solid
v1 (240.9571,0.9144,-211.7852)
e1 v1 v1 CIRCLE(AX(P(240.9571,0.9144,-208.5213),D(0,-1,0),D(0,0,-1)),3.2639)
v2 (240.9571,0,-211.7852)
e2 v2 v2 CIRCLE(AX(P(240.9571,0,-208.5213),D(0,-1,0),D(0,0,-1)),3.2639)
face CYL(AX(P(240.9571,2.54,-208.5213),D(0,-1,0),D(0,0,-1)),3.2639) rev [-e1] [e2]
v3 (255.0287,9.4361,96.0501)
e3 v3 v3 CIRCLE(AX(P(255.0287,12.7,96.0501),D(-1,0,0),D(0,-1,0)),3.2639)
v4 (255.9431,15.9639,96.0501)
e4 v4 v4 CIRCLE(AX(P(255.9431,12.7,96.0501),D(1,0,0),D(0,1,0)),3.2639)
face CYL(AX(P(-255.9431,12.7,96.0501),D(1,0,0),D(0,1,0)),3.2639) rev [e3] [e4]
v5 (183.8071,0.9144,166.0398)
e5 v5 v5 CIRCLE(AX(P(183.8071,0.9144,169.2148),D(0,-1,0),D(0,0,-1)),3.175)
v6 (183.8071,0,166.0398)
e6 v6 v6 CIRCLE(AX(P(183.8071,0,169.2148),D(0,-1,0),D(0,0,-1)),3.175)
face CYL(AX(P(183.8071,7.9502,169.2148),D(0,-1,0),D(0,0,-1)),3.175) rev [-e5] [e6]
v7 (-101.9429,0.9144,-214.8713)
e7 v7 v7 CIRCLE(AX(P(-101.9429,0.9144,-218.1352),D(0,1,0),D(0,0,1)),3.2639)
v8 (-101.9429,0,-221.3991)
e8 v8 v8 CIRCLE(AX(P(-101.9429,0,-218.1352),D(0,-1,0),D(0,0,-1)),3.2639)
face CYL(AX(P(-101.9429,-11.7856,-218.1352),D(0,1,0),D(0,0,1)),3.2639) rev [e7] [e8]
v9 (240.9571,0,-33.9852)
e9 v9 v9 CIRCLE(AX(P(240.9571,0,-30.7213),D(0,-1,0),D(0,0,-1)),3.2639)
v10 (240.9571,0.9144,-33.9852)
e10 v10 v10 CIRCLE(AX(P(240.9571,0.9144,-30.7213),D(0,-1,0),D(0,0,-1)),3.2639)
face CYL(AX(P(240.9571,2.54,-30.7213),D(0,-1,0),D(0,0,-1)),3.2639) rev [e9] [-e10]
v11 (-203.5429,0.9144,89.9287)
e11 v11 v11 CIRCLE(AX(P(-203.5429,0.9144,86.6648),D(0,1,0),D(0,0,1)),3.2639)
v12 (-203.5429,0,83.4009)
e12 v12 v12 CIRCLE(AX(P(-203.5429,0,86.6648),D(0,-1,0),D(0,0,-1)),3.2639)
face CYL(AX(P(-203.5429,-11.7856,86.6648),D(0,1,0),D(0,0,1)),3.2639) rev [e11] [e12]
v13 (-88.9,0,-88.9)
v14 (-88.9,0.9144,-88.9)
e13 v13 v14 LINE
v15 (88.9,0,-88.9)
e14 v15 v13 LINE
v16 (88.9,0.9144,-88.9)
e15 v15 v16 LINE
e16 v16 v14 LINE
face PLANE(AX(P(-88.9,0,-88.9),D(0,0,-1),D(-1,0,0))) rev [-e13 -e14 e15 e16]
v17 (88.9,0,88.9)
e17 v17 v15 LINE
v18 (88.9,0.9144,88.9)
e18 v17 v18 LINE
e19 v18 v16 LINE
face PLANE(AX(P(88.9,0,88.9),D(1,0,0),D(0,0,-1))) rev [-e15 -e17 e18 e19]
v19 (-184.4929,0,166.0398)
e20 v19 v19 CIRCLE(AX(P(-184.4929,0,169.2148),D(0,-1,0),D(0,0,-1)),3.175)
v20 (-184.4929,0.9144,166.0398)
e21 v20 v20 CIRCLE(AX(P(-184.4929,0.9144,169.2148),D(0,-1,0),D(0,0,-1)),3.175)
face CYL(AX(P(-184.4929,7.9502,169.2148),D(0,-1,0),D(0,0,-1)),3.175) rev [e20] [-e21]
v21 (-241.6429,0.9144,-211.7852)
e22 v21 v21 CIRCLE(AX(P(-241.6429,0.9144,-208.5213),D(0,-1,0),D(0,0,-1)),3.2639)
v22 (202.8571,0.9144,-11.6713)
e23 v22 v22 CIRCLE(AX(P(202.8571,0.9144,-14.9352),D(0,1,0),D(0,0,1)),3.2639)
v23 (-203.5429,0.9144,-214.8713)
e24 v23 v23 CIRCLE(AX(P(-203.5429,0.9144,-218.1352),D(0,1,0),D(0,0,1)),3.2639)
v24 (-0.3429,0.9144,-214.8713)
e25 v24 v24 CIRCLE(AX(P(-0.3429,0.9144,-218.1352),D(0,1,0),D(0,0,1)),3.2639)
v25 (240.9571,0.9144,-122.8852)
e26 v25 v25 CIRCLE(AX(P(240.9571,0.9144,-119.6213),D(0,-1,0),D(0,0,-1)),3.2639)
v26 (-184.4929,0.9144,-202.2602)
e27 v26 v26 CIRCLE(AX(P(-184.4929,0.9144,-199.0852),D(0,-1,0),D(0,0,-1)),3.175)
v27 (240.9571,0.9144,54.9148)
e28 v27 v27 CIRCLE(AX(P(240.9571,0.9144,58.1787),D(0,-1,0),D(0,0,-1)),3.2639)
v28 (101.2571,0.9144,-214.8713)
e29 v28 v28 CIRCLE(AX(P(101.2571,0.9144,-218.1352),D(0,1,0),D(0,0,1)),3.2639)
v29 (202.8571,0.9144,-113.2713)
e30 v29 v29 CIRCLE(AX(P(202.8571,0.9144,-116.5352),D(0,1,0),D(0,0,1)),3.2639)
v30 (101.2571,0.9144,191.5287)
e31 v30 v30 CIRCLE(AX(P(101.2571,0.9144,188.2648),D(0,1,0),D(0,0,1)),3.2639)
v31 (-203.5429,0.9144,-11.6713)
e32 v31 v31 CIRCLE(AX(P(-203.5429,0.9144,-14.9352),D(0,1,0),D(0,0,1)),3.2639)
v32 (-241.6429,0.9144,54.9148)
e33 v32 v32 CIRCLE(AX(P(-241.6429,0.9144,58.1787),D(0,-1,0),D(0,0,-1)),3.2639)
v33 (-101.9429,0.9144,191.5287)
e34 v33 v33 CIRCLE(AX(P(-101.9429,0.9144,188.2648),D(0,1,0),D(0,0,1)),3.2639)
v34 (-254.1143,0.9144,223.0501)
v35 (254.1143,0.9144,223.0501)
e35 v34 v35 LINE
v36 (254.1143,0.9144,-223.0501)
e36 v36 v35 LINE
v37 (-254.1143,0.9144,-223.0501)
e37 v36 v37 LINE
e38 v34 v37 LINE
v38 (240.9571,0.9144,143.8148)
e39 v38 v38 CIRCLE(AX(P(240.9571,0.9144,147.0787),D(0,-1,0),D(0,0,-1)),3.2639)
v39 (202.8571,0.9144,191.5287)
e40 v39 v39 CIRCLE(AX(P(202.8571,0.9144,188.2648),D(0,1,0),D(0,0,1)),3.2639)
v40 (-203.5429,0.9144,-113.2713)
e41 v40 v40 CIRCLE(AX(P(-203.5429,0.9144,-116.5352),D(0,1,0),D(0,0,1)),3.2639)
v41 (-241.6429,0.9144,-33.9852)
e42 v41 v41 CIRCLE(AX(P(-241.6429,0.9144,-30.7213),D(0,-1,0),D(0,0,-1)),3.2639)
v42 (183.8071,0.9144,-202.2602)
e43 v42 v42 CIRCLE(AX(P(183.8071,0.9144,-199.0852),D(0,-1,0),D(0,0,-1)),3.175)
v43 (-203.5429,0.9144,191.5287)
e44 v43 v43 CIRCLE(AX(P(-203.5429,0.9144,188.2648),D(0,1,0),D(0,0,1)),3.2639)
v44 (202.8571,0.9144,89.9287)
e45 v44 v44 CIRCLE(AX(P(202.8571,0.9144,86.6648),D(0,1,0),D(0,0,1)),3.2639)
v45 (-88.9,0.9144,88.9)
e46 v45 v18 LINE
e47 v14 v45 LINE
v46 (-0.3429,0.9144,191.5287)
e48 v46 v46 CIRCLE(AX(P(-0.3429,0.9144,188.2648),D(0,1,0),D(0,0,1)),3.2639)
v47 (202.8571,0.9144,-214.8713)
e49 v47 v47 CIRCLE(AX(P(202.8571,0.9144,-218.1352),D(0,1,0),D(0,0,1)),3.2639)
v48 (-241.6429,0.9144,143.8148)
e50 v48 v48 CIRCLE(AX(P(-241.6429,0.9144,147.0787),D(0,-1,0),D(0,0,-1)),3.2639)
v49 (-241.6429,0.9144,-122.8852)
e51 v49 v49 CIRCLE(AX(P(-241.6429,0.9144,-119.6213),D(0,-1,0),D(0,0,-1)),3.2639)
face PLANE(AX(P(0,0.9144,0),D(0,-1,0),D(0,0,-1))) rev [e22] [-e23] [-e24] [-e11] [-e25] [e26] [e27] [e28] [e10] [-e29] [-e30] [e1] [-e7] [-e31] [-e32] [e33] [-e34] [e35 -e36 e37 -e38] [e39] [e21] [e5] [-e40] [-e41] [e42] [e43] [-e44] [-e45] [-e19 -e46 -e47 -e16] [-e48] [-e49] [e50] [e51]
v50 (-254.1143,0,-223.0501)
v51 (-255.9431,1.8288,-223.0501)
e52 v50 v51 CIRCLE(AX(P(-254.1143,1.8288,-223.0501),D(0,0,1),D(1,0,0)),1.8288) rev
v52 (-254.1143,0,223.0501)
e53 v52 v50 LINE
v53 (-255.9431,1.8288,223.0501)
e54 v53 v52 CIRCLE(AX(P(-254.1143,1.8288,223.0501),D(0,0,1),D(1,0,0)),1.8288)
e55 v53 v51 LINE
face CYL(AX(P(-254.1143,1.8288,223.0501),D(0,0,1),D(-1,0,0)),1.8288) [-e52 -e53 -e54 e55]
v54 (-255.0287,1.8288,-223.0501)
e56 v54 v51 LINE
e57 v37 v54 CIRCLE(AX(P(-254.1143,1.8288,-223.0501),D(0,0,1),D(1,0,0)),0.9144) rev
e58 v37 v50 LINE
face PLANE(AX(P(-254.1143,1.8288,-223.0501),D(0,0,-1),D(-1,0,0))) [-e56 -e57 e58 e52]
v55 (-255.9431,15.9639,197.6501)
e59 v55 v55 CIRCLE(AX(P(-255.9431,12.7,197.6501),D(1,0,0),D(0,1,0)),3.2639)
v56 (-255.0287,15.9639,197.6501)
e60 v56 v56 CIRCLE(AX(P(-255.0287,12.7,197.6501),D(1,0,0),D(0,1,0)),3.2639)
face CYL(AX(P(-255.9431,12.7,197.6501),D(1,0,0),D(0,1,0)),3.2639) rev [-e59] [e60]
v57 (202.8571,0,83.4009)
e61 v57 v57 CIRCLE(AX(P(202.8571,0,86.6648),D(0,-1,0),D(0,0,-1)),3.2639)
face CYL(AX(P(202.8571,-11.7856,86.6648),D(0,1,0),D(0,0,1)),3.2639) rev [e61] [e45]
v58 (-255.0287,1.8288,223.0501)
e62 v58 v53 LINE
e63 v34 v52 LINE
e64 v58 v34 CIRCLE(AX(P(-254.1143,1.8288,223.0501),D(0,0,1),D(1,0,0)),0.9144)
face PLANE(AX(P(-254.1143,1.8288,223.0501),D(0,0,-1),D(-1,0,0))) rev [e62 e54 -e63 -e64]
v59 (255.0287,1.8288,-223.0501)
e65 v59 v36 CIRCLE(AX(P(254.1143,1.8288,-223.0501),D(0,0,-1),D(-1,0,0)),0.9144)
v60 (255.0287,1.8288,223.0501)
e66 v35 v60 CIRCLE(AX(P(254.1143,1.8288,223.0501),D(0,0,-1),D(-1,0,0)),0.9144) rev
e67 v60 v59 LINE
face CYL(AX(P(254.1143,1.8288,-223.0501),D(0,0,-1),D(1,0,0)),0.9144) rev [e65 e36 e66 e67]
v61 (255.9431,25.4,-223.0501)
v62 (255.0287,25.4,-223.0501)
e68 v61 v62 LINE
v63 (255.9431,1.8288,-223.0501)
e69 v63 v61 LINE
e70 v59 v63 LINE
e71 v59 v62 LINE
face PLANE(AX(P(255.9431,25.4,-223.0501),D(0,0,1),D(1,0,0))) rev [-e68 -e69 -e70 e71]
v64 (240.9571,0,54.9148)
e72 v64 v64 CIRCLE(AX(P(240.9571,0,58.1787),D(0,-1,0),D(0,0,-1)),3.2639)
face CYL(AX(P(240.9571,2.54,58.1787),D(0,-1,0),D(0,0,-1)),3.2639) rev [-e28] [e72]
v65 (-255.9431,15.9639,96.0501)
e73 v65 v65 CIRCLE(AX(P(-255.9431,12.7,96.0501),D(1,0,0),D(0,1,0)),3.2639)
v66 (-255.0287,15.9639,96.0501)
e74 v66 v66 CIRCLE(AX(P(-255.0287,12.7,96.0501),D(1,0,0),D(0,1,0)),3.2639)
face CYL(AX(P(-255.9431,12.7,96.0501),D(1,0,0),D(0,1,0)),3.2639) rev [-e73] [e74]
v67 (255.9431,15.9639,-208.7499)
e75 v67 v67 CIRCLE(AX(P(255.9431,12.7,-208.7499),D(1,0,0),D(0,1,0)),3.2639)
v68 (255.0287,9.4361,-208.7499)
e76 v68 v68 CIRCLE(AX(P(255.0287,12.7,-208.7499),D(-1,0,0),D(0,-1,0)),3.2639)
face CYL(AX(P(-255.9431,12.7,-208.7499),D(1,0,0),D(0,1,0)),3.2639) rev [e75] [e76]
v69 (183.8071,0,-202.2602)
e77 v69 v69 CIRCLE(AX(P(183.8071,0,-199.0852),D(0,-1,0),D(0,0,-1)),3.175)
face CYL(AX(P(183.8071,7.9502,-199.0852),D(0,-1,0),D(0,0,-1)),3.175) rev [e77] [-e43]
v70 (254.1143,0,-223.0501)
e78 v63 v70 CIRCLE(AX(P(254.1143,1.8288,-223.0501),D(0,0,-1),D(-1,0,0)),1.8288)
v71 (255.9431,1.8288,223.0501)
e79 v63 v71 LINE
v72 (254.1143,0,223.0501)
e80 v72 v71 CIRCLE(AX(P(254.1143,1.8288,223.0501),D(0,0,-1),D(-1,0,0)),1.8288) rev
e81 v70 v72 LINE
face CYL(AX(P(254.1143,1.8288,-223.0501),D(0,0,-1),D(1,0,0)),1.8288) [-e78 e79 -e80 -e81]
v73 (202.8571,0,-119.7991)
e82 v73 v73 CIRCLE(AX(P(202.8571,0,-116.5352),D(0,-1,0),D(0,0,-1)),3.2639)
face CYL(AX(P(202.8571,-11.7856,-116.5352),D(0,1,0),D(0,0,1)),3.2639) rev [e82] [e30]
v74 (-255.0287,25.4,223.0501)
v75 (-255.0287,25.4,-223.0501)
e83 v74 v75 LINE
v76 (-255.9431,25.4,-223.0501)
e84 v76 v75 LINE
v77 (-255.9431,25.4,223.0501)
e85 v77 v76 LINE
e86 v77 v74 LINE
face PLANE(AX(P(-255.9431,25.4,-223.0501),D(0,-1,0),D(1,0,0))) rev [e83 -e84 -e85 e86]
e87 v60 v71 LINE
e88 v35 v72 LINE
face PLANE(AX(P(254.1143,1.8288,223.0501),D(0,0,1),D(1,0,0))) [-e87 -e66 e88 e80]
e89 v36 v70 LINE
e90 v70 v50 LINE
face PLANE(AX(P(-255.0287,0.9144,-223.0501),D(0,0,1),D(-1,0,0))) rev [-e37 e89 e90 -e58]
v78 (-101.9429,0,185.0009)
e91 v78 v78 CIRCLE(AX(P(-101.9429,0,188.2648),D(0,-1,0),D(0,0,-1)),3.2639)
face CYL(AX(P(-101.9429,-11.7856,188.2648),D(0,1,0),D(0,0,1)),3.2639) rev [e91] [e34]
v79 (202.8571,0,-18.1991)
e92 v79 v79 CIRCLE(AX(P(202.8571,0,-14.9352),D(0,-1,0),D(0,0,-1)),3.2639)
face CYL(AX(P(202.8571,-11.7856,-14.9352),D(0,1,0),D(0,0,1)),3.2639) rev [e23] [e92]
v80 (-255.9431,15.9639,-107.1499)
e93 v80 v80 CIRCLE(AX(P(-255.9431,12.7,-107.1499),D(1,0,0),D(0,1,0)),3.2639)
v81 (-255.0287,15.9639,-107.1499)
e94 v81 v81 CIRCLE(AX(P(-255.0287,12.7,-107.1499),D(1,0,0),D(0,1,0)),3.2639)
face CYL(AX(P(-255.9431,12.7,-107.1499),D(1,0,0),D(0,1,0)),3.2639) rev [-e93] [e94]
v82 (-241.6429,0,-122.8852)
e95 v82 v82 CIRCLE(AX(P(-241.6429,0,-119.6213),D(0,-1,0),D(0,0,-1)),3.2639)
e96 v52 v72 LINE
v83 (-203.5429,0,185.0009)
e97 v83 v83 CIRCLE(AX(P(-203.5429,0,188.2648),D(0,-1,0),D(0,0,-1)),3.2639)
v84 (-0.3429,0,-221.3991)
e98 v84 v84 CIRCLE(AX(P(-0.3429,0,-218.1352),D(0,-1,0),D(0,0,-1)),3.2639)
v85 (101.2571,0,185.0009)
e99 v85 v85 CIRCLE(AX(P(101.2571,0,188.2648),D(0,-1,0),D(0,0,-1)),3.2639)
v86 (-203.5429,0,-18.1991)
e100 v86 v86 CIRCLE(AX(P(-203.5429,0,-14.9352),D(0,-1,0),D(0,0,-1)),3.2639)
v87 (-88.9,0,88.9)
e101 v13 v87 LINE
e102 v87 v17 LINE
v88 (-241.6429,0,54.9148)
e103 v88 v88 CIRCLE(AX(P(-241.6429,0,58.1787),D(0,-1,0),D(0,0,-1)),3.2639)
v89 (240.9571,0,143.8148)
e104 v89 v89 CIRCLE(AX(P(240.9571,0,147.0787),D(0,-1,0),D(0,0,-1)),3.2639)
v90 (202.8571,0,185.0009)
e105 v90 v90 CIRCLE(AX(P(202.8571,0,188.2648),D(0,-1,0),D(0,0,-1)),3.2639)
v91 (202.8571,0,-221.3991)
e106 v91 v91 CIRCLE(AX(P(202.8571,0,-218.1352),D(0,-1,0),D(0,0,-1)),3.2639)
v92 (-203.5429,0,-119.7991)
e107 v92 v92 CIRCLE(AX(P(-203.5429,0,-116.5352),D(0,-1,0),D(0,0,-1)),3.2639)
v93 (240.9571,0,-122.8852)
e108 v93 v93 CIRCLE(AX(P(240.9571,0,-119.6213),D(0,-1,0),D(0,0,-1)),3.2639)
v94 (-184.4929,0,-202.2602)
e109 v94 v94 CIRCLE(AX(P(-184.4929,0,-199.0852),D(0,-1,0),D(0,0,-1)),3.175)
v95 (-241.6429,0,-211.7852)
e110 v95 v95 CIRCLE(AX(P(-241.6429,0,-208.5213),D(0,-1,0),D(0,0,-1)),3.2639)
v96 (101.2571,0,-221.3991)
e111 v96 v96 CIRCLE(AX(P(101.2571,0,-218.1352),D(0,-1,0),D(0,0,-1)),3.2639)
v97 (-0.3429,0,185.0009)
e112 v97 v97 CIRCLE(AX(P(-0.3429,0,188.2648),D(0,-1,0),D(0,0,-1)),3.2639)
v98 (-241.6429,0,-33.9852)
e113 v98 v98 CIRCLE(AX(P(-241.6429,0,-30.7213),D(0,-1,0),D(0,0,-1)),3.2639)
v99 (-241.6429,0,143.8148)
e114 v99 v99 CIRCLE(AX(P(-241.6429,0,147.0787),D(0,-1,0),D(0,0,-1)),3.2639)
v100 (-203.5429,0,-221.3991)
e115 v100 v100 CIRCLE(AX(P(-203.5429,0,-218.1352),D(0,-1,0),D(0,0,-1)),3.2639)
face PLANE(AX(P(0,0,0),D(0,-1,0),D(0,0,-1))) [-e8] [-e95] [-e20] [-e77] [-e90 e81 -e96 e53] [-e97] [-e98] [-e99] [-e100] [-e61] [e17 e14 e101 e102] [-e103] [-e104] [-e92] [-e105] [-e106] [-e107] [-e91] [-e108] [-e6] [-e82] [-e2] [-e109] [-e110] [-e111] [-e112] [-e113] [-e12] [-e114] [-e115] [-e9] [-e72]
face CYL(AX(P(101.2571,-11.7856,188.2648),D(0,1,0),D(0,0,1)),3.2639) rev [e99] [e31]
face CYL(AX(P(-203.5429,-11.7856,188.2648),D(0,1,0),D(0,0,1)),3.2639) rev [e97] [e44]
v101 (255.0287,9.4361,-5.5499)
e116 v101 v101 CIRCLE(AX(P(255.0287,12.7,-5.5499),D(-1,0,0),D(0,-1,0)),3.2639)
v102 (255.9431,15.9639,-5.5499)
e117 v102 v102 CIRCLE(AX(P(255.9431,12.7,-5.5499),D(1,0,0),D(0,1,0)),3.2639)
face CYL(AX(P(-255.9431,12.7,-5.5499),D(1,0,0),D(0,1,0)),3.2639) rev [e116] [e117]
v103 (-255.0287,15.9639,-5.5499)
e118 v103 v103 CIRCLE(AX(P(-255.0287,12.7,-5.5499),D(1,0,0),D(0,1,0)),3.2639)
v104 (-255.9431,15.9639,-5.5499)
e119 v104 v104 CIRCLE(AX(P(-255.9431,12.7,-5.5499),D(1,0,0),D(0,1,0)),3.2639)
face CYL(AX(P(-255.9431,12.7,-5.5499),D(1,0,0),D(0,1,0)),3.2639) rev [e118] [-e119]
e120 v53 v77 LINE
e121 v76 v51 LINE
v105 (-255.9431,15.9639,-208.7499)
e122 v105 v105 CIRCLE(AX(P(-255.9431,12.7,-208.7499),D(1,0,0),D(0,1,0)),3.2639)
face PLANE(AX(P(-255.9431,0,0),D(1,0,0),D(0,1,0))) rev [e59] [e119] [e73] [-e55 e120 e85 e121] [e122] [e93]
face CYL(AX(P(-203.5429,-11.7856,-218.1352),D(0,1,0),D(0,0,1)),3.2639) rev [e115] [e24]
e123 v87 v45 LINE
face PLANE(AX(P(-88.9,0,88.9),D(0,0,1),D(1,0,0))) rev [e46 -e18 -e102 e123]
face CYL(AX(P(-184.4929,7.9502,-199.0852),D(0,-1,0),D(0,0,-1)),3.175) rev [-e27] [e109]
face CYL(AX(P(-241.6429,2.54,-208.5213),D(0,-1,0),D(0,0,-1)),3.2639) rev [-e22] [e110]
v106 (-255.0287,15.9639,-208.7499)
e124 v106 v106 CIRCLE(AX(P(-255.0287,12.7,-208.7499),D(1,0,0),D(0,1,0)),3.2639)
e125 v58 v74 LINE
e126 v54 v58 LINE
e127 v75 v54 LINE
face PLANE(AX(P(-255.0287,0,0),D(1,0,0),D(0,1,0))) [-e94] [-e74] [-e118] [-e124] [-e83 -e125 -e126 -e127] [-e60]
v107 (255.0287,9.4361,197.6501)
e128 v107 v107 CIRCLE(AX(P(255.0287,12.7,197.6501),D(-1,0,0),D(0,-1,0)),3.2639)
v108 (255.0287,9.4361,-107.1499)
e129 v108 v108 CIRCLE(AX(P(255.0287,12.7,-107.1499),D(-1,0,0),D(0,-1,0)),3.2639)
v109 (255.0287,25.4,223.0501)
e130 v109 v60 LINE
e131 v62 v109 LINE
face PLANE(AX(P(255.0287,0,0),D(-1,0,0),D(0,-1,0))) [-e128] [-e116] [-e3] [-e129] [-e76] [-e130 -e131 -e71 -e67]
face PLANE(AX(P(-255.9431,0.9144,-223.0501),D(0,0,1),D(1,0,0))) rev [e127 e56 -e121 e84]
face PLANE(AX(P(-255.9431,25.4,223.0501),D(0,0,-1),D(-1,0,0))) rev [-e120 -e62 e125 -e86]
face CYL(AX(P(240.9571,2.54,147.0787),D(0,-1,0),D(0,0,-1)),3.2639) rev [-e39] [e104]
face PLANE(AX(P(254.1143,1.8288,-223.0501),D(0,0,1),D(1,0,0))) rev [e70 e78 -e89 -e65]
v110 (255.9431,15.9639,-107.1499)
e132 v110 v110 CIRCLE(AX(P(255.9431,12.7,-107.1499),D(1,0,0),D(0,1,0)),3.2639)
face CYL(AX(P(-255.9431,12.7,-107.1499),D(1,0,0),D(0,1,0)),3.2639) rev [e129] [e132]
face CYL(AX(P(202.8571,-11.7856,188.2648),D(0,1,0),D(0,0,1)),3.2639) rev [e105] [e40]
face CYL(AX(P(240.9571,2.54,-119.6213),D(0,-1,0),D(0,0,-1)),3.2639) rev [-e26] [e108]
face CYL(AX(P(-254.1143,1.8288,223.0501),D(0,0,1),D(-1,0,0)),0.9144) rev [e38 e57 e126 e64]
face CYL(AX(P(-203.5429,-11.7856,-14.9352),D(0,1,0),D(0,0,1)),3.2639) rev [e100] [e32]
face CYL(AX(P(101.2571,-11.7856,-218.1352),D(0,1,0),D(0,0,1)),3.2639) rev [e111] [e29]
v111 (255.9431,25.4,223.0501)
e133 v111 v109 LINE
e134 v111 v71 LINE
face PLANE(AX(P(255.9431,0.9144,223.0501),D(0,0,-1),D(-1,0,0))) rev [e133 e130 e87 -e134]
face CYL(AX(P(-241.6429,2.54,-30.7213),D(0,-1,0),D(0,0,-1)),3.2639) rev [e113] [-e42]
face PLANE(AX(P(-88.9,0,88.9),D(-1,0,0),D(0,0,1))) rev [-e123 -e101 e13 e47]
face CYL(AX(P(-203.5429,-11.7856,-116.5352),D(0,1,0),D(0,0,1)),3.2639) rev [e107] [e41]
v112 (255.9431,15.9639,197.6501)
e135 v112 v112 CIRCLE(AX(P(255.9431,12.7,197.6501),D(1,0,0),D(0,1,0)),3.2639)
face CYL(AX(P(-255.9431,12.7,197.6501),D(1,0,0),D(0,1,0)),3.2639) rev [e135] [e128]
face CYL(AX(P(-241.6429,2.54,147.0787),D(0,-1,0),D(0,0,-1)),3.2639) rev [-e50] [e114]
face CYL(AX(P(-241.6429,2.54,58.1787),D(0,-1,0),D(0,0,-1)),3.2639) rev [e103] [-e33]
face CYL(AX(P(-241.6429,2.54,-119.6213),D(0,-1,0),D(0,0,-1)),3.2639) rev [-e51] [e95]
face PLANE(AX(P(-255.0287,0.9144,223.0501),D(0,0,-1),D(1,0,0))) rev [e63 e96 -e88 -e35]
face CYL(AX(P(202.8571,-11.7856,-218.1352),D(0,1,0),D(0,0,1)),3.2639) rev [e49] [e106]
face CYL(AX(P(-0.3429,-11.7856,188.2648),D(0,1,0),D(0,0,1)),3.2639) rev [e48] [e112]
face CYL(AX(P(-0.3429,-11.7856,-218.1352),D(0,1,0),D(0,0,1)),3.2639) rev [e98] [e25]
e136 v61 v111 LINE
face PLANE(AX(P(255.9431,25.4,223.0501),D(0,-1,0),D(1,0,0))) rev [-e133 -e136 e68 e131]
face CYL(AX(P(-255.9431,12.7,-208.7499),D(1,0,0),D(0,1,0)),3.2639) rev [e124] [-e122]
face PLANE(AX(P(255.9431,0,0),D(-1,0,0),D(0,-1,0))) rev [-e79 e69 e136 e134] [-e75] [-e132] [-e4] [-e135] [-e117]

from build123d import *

# Parameters (mm, degrees)
SKETCH1_W                    = 510.0574
SKETCH1_H                    = 446.1002
BOSS_EXTRUDE1_DEPTH          = 0.9144
SKETCH6_W                    = 177.8
SKETCH6_H                    = 177.8
CUT_EXTRUDE1_DEPTH           = 0.9144
EDGE_FLANGE1_STRIP_W         = 5.4864
EDGE_FLANGE1_STRIP_H         = 0.9144
EDGE_FLANGE1_STRIP_CUT_DEPTH = 446.1002
EDGE_FLANGE1_DEPTH           = 446.1002
EDGE_FLANGE2_STRIP_W         = 5.4864
EDGE_FLANGE2_STRIP_H         = 0.9144
EDGE_FLANGE2_STRIP_CUT_DEPTH = 446.1002
EDGE_FLANGE2_DEPTH           = 446.1002
SKETCH13_R                   = 3.2639
CUT_EXTRUDE2_DEPTH           = 2.54
SKETCH17_R                   = 3.175
CUT_EXTRUDE5_DEPTH           = 12.7
SKETCH18_R                   = 3.2639
CUT_EXTRUDE6_DEPTH           = 12.7
SKETCH19_R                   = 3.2639
CUT_EXTRUDE7_DEPTH           = 559.94900381


# Sheet-metal steps are written as plain solids
with BuildPart() as part:
    # Sketch1 → Boss-Extrude1 (new body)
    with BuildSketch(Plane(origin=(0, 0, 0), x_dir=(1, 0, 0), z_dir=(0, 1, 0))):
        Rectangle(SKETCH1_W, SKETCH1_H)
    extrude(amount=BOSS_EXTRUDE1_DEPTH)

    # Sketch6 → Cut-Extrude1 (cut)
    with BuildSketch(Plane(origin=(0, 0.9144, 0), x_dir=(1, 0, 0), z_dir=(0, 1, 0))):
        Rectangle(SKETCH6_W, SKETCH6_H)
    extrude(amount=-CUT_EXTRUDE1_DEPTH, mode=Mode.SUBTRACT)

    # Edge-Flange1 strip (across the edge) → Edge-Flange1 strip cut (cut)
    with BuildSketch(Plane(origin=(255.0287, 0.9144, 223.0501), x_dir=(-1, 0, 0), z_dir=(0, 0, -1))):
        with Locations((-1.8288, -0.4572)):
            Rectangle(EDGE_FLANGE1_STRIP_W, EDGE_FLANGE1_STRIP_H)
    extrude(amount=EDGE_FLANGE1_STRIP_CUT_DEPTH, mode=Mode.SUBTRACT)

    # Edge-Flange1 section (across the edge) → Edge-Flange1 (add)
    with BuildSketch(Plane(origin=(255.0287, 0.9144, 223.0501), x_dir=(-1, 0, 0), z_dir=(0, 0, -1))):
        with BuildLine():
            Line((-0.9144, 0.9144), (-0.9144, 24.4856))
            Line((-0.9144, 24.4856), (0, 24.4856))
            Line((0, 24.4856), (0, 0.9144))
            ThreePointArc((0, 0.9144), (0.267821559, 0.267821559), (0.9144, 0))
            Line((0.9144, 0), (0.9144, -0.9144))
            ThreePointArc((0.9144, -0.9144), (-0.378756881, -0.378756881), (-0.9144, 0.9144))
        make_face()
    extrude(amount=EDGE_FLANGE1_DEPTH)

    # Edge-Flange2 strip (across the edge) → Edge-Flange2 strip cut (cut)
    with BuildSketch(Plane(origin=(-255.0287, 0.9144, -223.0501), x_dir=(1, 0, 0), z_dir=(0, 0, 1))):
        with Locations((-1.8288, -0.4572)):
            Rectangle(EDGE_FLANGE2_STRIP_W, EDGE_FLANGE2_STRIP_H)
    extrude(amount=EDGE_FLANGE2_STRIP_CUT_DEPTH, mode=Mode.SUBTRACT)

    # Edge-Flange2 section (across the edge) → Edge-Flange2 (add)
    with BuildSketch(Plane(origin=(-255.0287, 0.9144, -223.0501), x_dir=(1, 0, 0), z_dir=(0, 0, 1))):
        with BuildLine():
            Line((-0.9144, 0.9144), (-0.9144, 24.4856))
            Line((-0.9144, 24.4856), (0, 24.4856))
            Line((0, 24.4856), (0, 0.9144))
            ThreePointArc((0, 0.9144), (0.267821559, 0.267821559), (0.9144, 0))
            Line((0.9144, 0), (0.9144, -0.9144))
            ThreePointArc((0.9144, -0.9144), (-0.378756881, -0.378756881), (-0.9144, 0.9144))
        make_face()
    extrude(amount=EDGE_FLANGE2_DEPTH)

    # Sketch13 → Cut-Extrude2 (cut)
    with BuildSketch(Plane(origin=(0, 0, 0), x_dir=(-1, 0, 0), z_dir=(0, -1, 0))):
        with Locations(Location((241.6429, 208.5213, 0), (0, 0, 90))):
            Circle(SKETCH13_R)
        with Locations(Location((241.6429, 119.6213, 0), (0, 0, 90))):
            Circle(SKETCH13_R)
        with Locations(Location((241.6429, 30.7213, 0), (0, 0, 90))):
            Circle(SKETCH13_R)
        with Locations(Location((241.6429, -58.1787, 0), (0, 0, 90))):
            Circle(SKETCH13_R)
        with Locations(Location((241.6429, -147.0787, 0), (0, 0, 90))):
            Circle(SKETCH13_R)
        with Locations(Location((-240.9571, -147.0787, 0), (0, 0, 90))):
            Circle(SKETCH13_R)
        with Locations(Location((-240.9571, -58.1787, 0), (0, 0, 90))):
            Circle(SKETCH13_R)
        with Locations(Location((-240.9571, 30.7213, 0), (0, 0, 90))):
            Circle(SKETCH13_R)
        with Locations(Location((-240.9571, 119.6213, 0), (0, 0, 90))):
            Circle(SKETCH13_R)
        with Locations(Location((-240.9571, 208.5213, 0), (0, 0, 90))):
            Circle(SKETCH13_R)
    extrude(amount=-CUT_EXTRUDE2_DEPTH, mode=Mode.SUBTRACT)

    # Sketch17 → Cut-Extrude5 (cut)
    with BuildSketch(Plane.XZ.offset(4.7498)):
        with Locations(Location((-184.4929, 169.2148, 0), (0, 0, 270))):
            Circle(SKETCH17_R)
        with Locations(Location((183.8071, 169.2148, 0), (0, 0, 270))):
            Circle(SKETCH17_R)
        with Locations(Location((183.8071, -199.0852, 0), (0, 0, 270))):
            Circle(SKETCH17_R)
        with Locations(Location((-184.4929, -199.0852, 0), (0, 0, 270))):
            Circle(SKETCH17_R)
    extrude(amount=-CUT_EXTRUDE5_DEPTH, mode=Mode.SUBTRACT)

    # Sketch18 → Cut-Extrude6 (cut)
    with BuildSketch(Plane(origin=(0, 0.9144, 0), x_dir=(1, 0, 0), z_dir=(0, 1, 0))):
        with Locations(Location((-203.5429, -188.2648, 0), (0, 0, 270))):
            Circle(SKETCH18_R)
        with Locations(Location((202.8571, 218.1352, 0), (0, 0, 270))):
            Circle(SKETCH18_R)
        with Locations(Location((-101.9429, -188.2648, 0), (0, 0, 270))):
            Circle(SKETCH18_R)
        with Locations(Location((-0.3429, -188.2648, 0), (0, 0, 270))):
            Circle(SKETCH18_R)
        with Locations(Location((101.2571, -188.2648, 0), (0, 0, 270))):
            Circle(SKETCH18_R)
        with Locations(Location((202.8571, -188.2648, 0), (0, 0, 270))):
            Circle(SKETCH18_R)
        with Locations(Location((-203.5429, -86.6648, 0), (0, 0, 270))):
            Circle(SKETCH18_R)
        with Locations(Location((-203.5429, 14.9352, 0), (0, 0, 270))):
            Circle(SKETCH18_R)
        with Locations(Location((-203.5429, 116.5352, 0), (0, 0, 270))):
            Circle(SKETCH18_R)
        with Locations((-203.5429, -289.8648)):
            Circle(SKETCH18_R)
        with Locations(Location((202.8571, 116.5352, 0), (0, 0, 270))):
            Circle(SKETCH18_R)
        with Locations((-203.5429, -391.4648)):
            Circle(SKETCH18_R)
        with Locations(Location((202.8571, 14.9352, 0), (0, 0, 270))):
            Circle(SKETCH18_R)
        with Locations((-203.5429, -493.0648)):
            Circle(SKETCH18_R)
        with Locations(Location((202.8571, -86.6648, 0), (0, 0, 270))):
            Circle(SKETCH18_R)
        with Locations((-305.1429, -188.2648)):
            Circle(SKETCH18_R)
        with Locations(Location((101.2571, 218.1352, 0), (0, 0, 270))):
            Circle(SKETCH18_R)
        with Locations((-406.7429, -188.2648)):
            Circle(SKETCH18_R)
        with Locations(Location((-0.3429, 218.1352, 0), (0, 0, 270))):
            Circle(SKETCH18_R)
        with Locations((-508.3429, -188.2648)):
            Circle(SKETCH18_R)
        with Locations(Location((-101.9429, 218.1352, 0), (0, 0, 270))):
            Circle(SKETCH18_R)
        with Locations((-609.9429, -188.2648)):
            Circle(SKETCH18_R)
        with Locations(Location((-203.5429, 218.1352, 0), (0, 0, 270))):
            Circle(SKETCH18_R)
    extrude(amount=-CUT_EXTRUDE6_DEPTH, mode=Mode.SUBTRACT)

    # Sketch19 → Cut-Extrude7 (cut, through all)
    with BuildSketch(Plane(origin=(255.9431, 0, 0), x_dir=(0, 0, -1), z_dir=(1, 0, 0))):
        with Locations(Location((-197.6501, 12.7, 0), (0, 0, 90))):
            Circle(SKETCH19_R)
        with Locations(Location((-96.0501, 12.7, 0), (0, 0, 90))):
            Circle(SKETCH19_R)
        with Locations(Location((5.5499, 12.7, 0), (0, 0, 90))):
            Circle(SKETCH19_R)
        with Locations(Location((107.1499, 12.7, 0), (0, 0, 90))):
            Circle(SKETCH19_R)
        with Locations(Location((208.7499, 12.7, 0), (0, 0, 90))):
            Circle(SKETCH19_R)
    extrude(amount=-CUT_EXTRUDE7_DEPTH, mode=Mode.SUBTRACT)


solid = part.part
